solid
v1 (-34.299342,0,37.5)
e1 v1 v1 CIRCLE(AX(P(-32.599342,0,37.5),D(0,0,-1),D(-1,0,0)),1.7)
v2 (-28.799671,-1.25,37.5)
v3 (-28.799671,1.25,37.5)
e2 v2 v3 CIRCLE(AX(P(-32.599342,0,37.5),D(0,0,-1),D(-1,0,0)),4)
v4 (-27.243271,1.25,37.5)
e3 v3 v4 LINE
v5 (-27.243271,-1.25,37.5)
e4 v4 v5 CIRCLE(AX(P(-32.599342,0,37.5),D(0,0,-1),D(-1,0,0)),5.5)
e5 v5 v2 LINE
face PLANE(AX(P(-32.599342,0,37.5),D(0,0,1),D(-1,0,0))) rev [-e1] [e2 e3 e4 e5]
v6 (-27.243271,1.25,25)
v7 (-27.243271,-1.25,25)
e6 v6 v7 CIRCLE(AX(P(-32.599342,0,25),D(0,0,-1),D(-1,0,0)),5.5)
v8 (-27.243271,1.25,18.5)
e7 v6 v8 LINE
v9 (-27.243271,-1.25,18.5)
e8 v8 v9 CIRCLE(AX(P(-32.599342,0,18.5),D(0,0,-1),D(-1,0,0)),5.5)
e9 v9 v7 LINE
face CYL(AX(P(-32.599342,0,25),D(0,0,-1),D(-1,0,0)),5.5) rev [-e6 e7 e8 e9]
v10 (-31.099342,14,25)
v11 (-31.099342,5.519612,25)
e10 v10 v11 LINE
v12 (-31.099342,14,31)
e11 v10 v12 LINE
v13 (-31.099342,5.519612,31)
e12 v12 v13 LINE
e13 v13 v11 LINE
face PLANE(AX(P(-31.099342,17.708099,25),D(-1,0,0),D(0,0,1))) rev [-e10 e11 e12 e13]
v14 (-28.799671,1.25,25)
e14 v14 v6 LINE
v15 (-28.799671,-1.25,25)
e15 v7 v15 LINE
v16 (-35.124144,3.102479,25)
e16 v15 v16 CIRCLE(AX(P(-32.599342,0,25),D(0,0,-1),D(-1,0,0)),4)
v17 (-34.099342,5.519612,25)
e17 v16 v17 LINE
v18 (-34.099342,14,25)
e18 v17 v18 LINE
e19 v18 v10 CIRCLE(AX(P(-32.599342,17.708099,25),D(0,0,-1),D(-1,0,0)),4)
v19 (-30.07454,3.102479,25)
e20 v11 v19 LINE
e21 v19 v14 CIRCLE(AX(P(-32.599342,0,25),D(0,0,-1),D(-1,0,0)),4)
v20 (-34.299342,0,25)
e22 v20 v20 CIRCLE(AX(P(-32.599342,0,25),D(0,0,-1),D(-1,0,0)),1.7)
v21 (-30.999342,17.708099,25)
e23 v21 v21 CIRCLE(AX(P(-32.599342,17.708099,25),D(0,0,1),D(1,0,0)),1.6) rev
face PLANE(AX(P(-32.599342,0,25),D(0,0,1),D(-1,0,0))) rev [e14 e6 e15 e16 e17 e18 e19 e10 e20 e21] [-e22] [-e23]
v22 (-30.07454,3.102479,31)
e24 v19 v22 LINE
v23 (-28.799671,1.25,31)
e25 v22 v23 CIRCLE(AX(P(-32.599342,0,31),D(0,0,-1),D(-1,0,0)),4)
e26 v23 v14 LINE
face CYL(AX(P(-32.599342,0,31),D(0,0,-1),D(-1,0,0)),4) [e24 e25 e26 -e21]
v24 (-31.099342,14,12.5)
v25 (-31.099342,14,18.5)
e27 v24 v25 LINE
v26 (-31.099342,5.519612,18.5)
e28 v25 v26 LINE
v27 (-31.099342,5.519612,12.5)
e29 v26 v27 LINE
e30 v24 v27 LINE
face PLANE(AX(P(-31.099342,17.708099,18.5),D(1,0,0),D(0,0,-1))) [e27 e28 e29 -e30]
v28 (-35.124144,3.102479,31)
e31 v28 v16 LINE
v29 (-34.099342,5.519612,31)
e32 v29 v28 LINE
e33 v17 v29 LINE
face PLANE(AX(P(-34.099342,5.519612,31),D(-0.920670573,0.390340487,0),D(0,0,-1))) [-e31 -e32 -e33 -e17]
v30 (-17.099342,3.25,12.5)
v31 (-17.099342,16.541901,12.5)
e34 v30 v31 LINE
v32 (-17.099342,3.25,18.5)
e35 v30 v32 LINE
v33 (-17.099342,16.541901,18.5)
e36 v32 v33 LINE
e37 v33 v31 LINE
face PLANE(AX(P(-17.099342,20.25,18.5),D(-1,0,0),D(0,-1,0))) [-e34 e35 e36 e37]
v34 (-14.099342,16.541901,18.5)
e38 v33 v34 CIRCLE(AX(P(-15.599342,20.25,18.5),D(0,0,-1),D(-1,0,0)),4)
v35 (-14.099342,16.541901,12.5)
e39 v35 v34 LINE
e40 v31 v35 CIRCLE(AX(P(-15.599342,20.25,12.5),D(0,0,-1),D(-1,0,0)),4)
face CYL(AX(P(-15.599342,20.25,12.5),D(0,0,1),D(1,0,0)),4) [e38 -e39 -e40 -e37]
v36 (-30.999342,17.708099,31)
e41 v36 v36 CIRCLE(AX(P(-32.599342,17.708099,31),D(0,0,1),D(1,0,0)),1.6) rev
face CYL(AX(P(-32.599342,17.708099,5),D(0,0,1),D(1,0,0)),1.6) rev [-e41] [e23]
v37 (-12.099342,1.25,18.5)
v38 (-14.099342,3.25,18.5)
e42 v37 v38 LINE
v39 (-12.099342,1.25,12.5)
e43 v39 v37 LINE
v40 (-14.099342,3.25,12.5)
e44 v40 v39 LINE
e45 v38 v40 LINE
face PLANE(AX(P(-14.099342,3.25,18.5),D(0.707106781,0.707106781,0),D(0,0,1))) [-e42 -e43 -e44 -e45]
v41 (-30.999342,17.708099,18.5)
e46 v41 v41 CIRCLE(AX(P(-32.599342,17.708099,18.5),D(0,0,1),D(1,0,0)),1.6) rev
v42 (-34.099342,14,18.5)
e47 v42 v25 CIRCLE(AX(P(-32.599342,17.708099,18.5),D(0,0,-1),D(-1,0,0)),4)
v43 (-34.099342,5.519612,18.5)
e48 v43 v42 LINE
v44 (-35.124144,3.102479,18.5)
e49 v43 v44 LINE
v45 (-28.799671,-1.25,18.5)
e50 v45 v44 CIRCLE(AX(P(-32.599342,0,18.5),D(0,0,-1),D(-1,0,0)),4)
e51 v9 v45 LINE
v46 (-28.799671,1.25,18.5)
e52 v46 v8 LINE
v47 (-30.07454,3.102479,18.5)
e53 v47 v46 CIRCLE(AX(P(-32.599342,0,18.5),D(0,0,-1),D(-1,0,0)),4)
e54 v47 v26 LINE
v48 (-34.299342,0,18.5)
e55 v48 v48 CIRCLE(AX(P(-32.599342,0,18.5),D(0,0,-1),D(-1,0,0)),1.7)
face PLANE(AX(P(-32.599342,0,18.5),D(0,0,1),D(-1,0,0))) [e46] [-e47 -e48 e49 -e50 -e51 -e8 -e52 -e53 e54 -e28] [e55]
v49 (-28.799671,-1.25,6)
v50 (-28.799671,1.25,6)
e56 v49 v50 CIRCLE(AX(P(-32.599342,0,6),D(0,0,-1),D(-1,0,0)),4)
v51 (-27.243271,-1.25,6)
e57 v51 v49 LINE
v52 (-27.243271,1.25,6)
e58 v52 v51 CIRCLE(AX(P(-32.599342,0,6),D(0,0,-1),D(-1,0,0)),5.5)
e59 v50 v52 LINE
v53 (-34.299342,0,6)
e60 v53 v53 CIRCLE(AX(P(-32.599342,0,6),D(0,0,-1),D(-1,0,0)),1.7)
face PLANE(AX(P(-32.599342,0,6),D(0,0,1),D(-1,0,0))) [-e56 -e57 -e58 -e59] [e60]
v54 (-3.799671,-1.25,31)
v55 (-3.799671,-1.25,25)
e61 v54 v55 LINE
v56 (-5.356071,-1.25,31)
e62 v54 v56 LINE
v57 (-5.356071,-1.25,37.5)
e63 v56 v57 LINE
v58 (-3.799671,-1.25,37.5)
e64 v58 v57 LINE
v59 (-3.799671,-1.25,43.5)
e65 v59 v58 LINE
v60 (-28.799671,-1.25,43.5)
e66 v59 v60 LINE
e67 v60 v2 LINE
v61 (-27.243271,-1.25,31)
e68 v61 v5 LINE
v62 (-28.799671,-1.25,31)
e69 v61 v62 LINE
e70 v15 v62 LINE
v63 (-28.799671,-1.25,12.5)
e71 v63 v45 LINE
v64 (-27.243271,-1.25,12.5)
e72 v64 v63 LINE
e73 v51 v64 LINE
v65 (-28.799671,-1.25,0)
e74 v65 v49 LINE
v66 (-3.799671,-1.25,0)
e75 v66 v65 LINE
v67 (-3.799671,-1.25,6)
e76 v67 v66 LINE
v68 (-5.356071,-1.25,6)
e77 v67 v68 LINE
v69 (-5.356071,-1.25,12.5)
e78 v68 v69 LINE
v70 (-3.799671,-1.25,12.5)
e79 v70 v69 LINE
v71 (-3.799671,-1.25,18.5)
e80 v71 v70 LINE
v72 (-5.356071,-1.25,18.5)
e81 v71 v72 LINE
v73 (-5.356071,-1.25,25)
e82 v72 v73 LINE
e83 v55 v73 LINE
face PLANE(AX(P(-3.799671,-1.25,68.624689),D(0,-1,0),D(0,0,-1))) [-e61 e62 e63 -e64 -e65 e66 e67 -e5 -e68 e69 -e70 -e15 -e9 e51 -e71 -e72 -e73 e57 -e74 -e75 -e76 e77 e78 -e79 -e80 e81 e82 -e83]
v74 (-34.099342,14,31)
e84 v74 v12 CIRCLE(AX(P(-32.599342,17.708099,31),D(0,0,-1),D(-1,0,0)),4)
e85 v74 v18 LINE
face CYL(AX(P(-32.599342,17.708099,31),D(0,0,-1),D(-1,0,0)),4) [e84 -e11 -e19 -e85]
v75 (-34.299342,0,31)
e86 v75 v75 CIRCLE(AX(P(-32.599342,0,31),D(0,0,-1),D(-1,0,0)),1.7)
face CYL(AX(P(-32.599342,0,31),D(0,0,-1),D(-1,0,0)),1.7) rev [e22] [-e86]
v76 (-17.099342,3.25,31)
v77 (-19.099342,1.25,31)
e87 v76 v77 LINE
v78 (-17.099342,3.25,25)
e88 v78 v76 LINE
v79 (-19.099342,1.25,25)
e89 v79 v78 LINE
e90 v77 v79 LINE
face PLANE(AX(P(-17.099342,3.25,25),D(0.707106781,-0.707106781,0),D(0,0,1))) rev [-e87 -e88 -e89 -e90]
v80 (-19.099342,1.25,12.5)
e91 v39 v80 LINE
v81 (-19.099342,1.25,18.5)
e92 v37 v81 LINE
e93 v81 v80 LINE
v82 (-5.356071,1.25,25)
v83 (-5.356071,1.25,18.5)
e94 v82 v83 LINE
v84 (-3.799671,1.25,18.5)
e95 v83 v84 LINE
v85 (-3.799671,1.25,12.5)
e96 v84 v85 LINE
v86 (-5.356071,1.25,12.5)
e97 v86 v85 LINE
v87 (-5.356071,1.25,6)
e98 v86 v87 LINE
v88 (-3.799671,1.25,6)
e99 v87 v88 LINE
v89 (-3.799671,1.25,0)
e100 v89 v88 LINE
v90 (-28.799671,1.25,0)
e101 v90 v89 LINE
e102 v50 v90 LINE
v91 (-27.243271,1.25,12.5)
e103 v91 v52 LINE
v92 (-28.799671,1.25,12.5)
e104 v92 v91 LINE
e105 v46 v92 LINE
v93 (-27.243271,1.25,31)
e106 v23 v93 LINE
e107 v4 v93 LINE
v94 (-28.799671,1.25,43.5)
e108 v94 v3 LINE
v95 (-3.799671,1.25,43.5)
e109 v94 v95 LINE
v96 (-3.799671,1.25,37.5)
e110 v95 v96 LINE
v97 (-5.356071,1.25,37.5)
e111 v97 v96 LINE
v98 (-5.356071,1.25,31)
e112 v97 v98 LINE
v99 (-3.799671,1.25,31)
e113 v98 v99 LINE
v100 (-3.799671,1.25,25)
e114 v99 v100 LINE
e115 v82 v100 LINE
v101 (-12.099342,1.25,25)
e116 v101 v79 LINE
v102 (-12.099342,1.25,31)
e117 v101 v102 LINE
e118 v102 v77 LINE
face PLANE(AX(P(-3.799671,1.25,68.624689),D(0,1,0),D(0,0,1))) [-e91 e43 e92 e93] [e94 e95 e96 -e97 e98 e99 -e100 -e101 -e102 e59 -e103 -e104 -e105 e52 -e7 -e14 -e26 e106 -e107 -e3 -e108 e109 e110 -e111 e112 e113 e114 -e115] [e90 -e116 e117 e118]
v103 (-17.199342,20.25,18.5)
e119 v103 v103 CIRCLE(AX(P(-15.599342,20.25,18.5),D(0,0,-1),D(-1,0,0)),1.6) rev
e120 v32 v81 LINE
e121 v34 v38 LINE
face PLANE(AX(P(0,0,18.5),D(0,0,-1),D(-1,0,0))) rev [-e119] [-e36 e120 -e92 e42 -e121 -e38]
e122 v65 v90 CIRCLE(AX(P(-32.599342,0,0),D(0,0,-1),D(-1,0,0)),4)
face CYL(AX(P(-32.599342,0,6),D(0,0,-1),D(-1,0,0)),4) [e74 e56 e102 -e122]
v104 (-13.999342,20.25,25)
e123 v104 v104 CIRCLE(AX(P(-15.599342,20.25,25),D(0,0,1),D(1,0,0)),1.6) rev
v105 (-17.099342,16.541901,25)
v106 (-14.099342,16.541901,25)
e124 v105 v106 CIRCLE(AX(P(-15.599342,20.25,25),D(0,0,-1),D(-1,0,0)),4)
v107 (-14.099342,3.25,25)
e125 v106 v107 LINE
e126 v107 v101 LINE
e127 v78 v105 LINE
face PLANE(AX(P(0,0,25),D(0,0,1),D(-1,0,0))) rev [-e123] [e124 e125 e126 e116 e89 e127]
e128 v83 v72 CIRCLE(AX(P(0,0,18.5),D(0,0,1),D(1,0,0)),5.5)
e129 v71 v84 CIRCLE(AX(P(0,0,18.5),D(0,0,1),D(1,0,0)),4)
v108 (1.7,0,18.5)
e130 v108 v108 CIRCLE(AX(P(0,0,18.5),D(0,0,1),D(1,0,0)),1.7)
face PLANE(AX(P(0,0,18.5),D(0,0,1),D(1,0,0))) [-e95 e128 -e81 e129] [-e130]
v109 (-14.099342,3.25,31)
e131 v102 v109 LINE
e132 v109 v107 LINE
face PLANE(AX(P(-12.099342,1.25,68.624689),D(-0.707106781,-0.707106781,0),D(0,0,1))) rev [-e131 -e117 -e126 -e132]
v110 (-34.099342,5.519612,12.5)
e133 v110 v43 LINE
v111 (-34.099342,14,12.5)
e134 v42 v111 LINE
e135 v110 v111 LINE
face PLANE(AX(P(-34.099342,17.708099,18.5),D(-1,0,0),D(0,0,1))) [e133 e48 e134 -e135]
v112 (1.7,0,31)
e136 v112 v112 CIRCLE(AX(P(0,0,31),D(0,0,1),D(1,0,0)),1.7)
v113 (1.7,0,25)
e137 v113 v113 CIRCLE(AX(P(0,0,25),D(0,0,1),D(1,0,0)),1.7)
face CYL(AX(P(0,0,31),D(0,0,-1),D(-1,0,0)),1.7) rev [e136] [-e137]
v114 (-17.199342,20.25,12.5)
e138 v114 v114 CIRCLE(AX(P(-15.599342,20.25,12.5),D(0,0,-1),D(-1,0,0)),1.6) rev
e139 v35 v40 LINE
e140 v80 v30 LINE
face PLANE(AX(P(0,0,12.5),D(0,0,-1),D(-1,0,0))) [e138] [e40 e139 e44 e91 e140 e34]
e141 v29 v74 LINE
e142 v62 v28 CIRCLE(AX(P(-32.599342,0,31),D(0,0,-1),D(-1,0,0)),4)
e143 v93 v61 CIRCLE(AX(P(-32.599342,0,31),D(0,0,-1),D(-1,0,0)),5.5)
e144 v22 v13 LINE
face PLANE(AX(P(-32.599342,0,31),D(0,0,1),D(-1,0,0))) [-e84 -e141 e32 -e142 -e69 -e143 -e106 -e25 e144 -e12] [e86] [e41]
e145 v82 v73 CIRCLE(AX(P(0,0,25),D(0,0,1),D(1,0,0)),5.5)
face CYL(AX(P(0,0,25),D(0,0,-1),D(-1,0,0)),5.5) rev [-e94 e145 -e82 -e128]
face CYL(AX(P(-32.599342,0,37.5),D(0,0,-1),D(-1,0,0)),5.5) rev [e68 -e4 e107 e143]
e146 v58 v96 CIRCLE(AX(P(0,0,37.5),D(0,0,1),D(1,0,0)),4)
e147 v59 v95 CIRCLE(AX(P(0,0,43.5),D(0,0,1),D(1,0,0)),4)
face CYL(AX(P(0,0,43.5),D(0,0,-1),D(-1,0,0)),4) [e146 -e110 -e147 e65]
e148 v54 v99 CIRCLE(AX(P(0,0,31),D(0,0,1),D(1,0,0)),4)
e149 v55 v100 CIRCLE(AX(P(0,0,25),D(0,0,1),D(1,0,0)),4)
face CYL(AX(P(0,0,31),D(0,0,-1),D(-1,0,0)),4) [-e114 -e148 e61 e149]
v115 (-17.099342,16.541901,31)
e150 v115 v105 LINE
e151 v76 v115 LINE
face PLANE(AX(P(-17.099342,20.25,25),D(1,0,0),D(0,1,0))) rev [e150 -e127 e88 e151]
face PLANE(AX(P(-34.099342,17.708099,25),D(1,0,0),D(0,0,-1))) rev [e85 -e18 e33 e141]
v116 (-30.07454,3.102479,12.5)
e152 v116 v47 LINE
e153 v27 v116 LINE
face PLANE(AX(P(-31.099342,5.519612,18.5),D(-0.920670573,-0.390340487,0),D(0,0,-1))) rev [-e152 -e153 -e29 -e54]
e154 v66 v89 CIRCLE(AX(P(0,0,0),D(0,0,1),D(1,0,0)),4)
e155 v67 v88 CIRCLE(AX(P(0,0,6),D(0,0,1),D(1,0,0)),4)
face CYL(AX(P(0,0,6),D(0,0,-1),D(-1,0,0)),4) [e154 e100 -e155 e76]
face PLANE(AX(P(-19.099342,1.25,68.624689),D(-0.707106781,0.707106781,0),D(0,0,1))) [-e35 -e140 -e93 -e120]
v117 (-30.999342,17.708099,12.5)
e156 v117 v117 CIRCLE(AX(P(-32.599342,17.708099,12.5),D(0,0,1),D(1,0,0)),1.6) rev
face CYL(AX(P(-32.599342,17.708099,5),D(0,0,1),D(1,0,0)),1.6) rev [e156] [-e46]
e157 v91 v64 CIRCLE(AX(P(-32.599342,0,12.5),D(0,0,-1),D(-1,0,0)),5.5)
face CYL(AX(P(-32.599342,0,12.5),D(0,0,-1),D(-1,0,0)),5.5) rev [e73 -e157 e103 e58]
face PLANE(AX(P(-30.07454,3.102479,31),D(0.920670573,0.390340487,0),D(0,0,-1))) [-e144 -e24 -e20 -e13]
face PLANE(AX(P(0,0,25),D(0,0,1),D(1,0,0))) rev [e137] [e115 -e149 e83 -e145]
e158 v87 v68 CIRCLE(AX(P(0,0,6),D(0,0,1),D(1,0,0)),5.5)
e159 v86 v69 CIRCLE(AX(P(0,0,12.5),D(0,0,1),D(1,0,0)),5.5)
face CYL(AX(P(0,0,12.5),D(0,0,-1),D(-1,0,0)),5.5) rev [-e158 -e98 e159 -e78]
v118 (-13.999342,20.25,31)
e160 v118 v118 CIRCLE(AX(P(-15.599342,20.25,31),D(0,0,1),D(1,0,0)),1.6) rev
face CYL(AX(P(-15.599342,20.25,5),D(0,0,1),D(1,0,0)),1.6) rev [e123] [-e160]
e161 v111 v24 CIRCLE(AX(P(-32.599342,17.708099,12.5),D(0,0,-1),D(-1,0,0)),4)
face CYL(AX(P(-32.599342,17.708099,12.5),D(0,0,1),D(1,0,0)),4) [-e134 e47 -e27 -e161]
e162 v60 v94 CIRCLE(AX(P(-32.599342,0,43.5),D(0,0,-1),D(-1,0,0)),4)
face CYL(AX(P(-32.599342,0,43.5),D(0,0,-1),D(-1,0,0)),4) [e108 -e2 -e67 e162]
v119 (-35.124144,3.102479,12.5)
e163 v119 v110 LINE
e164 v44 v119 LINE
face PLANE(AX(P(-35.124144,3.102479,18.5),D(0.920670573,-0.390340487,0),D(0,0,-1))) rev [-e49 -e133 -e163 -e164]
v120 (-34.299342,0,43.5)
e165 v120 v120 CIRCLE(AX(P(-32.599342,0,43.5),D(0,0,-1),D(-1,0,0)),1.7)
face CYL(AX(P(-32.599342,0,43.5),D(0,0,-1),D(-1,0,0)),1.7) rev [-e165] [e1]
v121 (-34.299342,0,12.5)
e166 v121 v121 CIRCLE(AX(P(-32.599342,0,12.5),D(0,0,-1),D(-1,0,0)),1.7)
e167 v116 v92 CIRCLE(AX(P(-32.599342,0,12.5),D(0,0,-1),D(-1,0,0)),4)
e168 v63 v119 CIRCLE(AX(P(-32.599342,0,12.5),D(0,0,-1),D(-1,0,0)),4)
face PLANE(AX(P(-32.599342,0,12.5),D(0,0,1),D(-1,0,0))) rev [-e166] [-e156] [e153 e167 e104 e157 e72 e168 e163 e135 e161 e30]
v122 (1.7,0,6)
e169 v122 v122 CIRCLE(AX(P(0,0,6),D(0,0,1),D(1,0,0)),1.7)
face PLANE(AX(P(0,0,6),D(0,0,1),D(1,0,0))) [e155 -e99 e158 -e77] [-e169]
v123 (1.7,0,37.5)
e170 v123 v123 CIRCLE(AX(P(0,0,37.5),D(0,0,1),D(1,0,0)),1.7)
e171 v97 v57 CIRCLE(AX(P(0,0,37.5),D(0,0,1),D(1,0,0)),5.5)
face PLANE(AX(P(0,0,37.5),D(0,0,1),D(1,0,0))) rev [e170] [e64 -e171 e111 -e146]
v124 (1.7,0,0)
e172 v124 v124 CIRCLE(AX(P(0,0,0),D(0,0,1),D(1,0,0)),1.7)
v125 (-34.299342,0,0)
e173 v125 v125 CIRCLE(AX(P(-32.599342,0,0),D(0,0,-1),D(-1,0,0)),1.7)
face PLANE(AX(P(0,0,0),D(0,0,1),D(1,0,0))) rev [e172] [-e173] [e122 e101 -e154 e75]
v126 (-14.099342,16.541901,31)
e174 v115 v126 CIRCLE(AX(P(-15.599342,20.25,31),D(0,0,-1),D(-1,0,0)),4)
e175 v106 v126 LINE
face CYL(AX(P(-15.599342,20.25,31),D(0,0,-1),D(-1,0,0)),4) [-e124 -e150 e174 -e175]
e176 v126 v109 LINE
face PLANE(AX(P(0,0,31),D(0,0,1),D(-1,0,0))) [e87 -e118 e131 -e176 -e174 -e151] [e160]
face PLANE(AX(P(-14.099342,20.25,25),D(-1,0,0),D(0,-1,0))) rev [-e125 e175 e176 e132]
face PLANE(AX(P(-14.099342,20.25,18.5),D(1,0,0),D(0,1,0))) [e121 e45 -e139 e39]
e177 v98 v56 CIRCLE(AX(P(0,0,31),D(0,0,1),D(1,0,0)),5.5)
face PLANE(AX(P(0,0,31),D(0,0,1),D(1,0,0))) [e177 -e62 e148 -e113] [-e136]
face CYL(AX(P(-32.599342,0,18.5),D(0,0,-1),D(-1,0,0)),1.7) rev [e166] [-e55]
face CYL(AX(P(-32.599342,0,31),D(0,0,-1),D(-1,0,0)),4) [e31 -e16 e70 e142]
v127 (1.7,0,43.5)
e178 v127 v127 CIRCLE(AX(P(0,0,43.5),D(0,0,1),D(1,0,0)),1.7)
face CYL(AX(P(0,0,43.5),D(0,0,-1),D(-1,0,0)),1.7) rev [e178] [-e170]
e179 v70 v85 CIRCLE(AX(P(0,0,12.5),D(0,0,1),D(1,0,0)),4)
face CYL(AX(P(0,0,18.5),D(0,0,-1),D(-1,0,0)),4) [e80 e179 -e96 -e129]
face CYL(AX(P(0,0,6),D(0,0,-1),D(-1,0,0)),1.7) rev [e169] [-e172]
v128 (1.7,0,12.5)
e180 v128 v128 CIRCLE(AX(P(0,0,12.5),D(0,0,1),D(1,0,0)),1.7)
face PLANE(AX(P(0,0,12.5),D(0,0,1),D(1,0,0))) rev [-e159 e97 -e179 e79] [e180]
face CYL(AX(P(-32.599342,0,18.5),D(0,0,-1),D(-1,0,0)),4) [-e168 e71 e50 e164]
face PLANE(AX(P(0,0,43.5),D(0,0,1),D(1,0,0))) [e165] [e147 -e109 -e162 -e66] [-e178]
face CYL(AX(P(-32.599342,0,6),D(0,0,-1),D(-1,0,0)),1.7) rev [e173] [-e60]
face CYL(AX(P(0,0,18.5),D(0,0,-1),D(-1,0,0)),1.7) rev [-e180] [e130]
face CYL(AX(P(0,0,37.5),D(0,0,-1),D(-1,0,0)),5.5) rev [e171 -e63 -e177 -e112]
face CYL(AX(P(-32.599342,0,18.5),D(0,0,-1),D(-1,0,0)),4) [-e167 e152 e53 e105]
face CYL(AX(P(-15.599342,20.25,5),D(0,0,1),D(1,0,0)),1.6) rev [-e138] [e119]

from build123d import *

# Parameters (mm, degrees)
SKETCH_2_R                   = 4
SKETCH_2_R_2                 = 1.7
EXTRUDE_1_DEPTH              = 6
PATTERN_LINEAR_1_COUNT       = 4
PATTERN_LINEAR_1_PITCH       = 12.5
EXTRUDE_START                = -43.5
SKETCH_3_W                   = 25
SKETCH_3_H                   = 2.5
EXTRUDE_2_DEPTH              = 43.5
SKETCH_4_R                   = 5.5
CUT_EXTRUDE_1_DEPTH          = 6.5
PATTERN_LINEAR_2_COUNT       = 4
PATTERN_LINEAR_2_PITCH       = 12.5
PATTERN_START                = 12.5
PATTERN_LINEAR_3_OUTLINE_R   = 1.7
PATTERN_LINEAR_3_DEPTH       = 6
PATTERN_START_2              = 25
PATTERN_LINEAR_3_2_OUTLINE_R = 1.7
PATTERN_LINEAR_3_2_DEPTH     = 6
PATTERN_START_3              = 37.5
PATTERN_LINEAR_3_3_OUTLINE_R = 1.7
PATTERN_LINEAR_3_3_DEPTH     = 6
MIRROR_3_COPY_1_SKETCH_R     = 5.5
MIRROR_3_COPY_1_DEPTH        = 6.5
MIRROR_3_COPY_2_SKETCH_R     = 5.5
MIRROR_3_COPY_2_DEPTH        = 6.5
MIRROR_3_COPY_3_SKETCH_R     = 5.5
MIRROR_3_COPY_3_DEPTH        = 6.5
SKETCH_5_W                   = 3
SKETCH_5_H                   = 14
SKETCH_5_H_2                 = 19
EXTRUDE_3_DEPTH              = 6
SKETCH_6_R                   = 4
EXTRUDE_4_DEPTH              = 6
CUT_EXTRUDE_2_DEPTH          = 20
CUT_EXTRUDE_2_DEPTH_BACK     = 10
SKETCH_7_R                   = 1.6
CHAMFER_1_SIZE               = 2
CHAMFER_2_SIZE               = 1.81151278


with BuildPart() as part:
    # Эскиз2 → Бобышка-Вытянуть1 (new body)
    with BuildSketch(Plane.XY):
        Circle(SKETCH_2_R)
        Circle(SKETCH_2_R_2, mode=Mode.SUBTRACT)
    extrude_1 = extrude(amount=EXTRUDE_1_DEPTH)


with BuildPart() as pattern_linear_1_1:
    # Линейный массив1: pattern copy
    add(part.part.moved(Location(Vector(0, 0, 1) * (1 * PATTERN_LINEAR_1_PITCH))))


with BuildPart() as pattern_linear_1_2:
    # Линейный массив1: pattern copy
    add(part.part.moved(Location(Vector(0, 0, 1) * (2 * PATTERN_LINEAR_1_PITCH))))


with BuildPart() as pattern_linear_1_3:
    # Линейный массив1: pattern copy
    add(part.part.moved(Location(Vector(0, 0, 1) * (3 * PATTERN_LINEAR_1_PITCH))))


with BuildPart() as part_1:
    add(part.part)

    add(pattern_linear_1_1.part)  # Бобышка-Вытянуть2 merges Линейный массив1_1

    add(pattern_linear_1_2.part)  # Бобышка-Вытянуть2 merges Линейный массив1_2

    add(pattern_linear_1_3.part)  # Бобышка-Вытянуть2 merges Линейный массив1_3
    # Эскиз3 → Бобышка-Вытянуть2 (add)
    with BuildSketch(Plane(origin=(0, 0, 0), x_dir=(-1, 0, 0), z_dir=(0, 0, -1)).offset(EXTRUDE_START)):
        with Locations((16.299671038, 0)):
            Rectangle(SKETCH_3_W, SKETCH_3_H)
    extrude(amount=EXTRUDE_2_DEPTH)

    # Эскиз4 → Вырез-Вытянуть1 (cut)
    with BuildSketch(Plane.XY.offset(6)):
        Circle(SKETCH_4_R)
    cut_extrude_1 = extrude(amount=CUT_EXTRUDE_1_DEPTH, mode=Mode.SUBTRACT)

    # Линейный массив2: Вырез-Вытянуть1 ×4
    with Locations(*[(0, 0, i * PATTERN_LINEAR_2_PITCH) for i in range(1, PATTERN_LINEAR_2_COUNT)]):
        add(cut_extrude_1, mode=Mode.SUBTRACT)

    # Зеркальное отражение1: Бобышка-Вытянуть1 across plane
    add(extrude_1.mirror(Plane.ZY.offset(16.299671038)))

    # Линейный массив3: read off the stored shape, not the designer's step
    # Линейный массив3 outline → Линейный массив3 (add)
    with BuildSketch(Plane.XY.offset(PATTERN_START)):
        with BuildLine():
            ThreePointArc((-28.799671038, 1.25), (-36.599342077, 0), (-28.799671038, -1.25))
            Line((-28.799671038, -1.25), (-28.799671038, 1.25))
        make_face()
        with Locations((-32.599342077, 0)):
            Circle(PATTERN_LINEAR_3_OUTLINE_R, mode=Mode.SUBTRACT)
    extrude(amount=PATTERN_LINEAR_3_DEPTH)

    # Pattern Linear 3 2 outline → Pattern Linear 3 2 (add)
    with BuildSketch(Plane.XY.offset(PATTERN_START_2)):
        with BuildLine():
            ThreePointArc((-28.799671038, 1.25), (-36.599342077, 0), (-28.799671038, -1.25))
            Line((-28.799671038, -1.25), (-28.799671038, 1.25))
        make_face()
        with Locations((-32.599342077, 0)):
            Circle(PATTERN_LINEAR_3_2_OUTLINE_R, mode=Mode.SUBTRACT)
    extrude(amount=PATTERN_LINEAR_3_2_DEPTH)

    # Pattern Linear 3 3 outline → Pattern Linear 3 3 (add)
    with BuildSketch(Plane.XY.offset(PATTERN_START_3)):
        with BuildLine():
            ThreePointArc((-28.799671038, 1.25), (-36.599342077, 0), (-28.799671038, -1.25))
            Line((-28.799671038, -1.25), (-28.799671038, 1.25))
        make_face()
        with Locations((-32.599342077, 0)):
            Circle(PATTERN_LINEAR_3_3_OUTLINE_R, mode=Mode.SUBTRACT)
    extrude(amount=PATTERN_LINEAR_3_3_DEPTH)

    # Зеркальное отражение3: Вырез-Вытянуть1 across plane
    add(cut_extrude_1.mirror(Plane.ZY.offset(16.299671038)), mode=Mode.SUBTRACT)

    # Зеркальное отражение3 copy 1 sketch → Зеркальное отражение3 copy 1 (cut)
    with BuildSketch(Plane(origin=(-32.599342077, 0, 18.5), x_dir=(-1, 0, 0), z_dir=(0, 0, 1))):
        Circle(MIRROR_3_COPY_1_SKETCH_R)
    extrude(amount=MIRROR_3_COPY_1_DEPTH, mode=Mode.SUBTRACT)

    # Зеркальное отражение3 copy 2 sketch → Зеркальное отражение3 copy 2 (cut)
    with BuildSketch(Plane(origin=(-32.599342077, 0, 31), x_dir=(-1, 0, 0), z_dir=(0, 0, 1))):
        Circle(MIRROR_3_COPY_2_SKETCH_R)
    extrude(amount=MIRROR_3_COPY_2_DEPTH, mode=Mode.SUBTRACT)

    # Зеркальное отражение3 copy 3 sketch → Зеркальное отражение3 copy 3 (cut)
    with BuildSketch(Plane(origin=(-32.599342077, 0, 43.5), x_dir=(-1, 0, 0), z_dir=(0, 0, 1))):
        Circle(MIRROR_3_COPY_3_SKETCH_R)
    extrude(amount=MIRROR_3_COPY_3_DEPTH, mode=Mode.SUBTRACT)

    # Эскиз5 → Бобышка-Вытянуть3 (add)
    with BuildSketch(Plane(origin=(0, 0, 12.5), x_dir=(-1, 0, 0), z_dir=(0, 0, -1))):
        with Locations((32.599342077, 10.708099244)):
            Rectangle(SKETCH_5_W, SKETCH_5_H)
        with Locations((15.599342077, 10.75)):
            Rectangle(SKETCH_5_W, SKETCH_5_H_2)
    extrude_3 = extrude(amount=-EXTRUDE_3_DEPTH)

    # Зеркальное отражение4: Бобышка-Вытянуть3 across plane
    add(extrude_3.mirror(Plane.XY.offset(21.75)))

    # Эскиз6 → Бобышка-Вытянуть4 (add)
    with BuildSketch(Plane(origin=(0, 0, 25), x_dir=(-1, 0, 0), z_dir=(0, 0, -1))):
        with Locations((32.599342077, 17.708099244)):
            Circle(SKETCH_6_R)
        with Locations((15.599342077, 20.25)):
            Circle(SKETCH_6_R)
    extrude_4 = extrude(amount=-EXTRUDE_4_DEPTH)

    # Зеркальное отражение5: Бобышка-Вытянуть4 across plane
    add(extrude_4.mirror(Plane.XY.offset(21.75)))

    # Эскиз7 → Вырез-Вытянуть2 (cut, two sides: drawn at the far end of the back side and taken through both)
    with BuildSketch(Plane(origin=(0, 0, 25), x_dir=(-1, 0, 0), z_dir=(0, 0, -1)).offset(-CUT_EXTRUDE_2_DEPTH_BACK)):
        with Locations(Location((32.599342077, 17.708099244, 0), (0, 0, 180))):
            Circle(SKETCH_7_R)
        with Locations(Location((15.599342077, 20.25, 0), (0, 0, 180))):
            Circle(SKETCH_7_R)
    extrude(amount=CUT_EXTRUDE_2_DEPTH + CUT_EXTRUDE_2_DEPTH_BACK, mode=Mode.SUBTRACT)

    # Фаска1
    chamfer_1_edges = [part_1.edges().sort_by_distance(p)[0] for p in [
        (-14.099342077, 1.25, 15.5),
        (-17.099342077, 1.25, 15.5),
        (-14.099342077, 1.25, 28),
        (-17.099342077, 1.25, 28),
    ]]
    chamfer(chamfer_1_edges, length=CHAMFER_1_SIZE)

    # Фаска2
    # the kernel refuses this chamfer: 1.81151278, 1 mm, written as the material it adds along each edge
    with BuildSketch(Plane(origin=(-31.099342077, 3.708099244, 12.5), x_dir=(0, 1, 0), z_dir=(0, 0, 1))) as chamfer_2_piece_1:
        with BuildLine():
            Line((CHAMFER_2_SIZE, 0), (-0.60562029, -1.024801843))
            ThreePointArc((-0.60562029, -1.024801843), (-0.279646114, -0.560511864), (0, 0))
            Line((0, 0), (CHAMFER_2_SIZE, 0))
        make_face()
    extrude(amount=6)
    with BuildSketch(Plane(origin=(-34.099342077, 3.708099244, 12.5), x_dir=(-0.8609060833404796, -0.5087639095566383, 0), z_dir=(0, 0, 1))) as chamfer_2_piece_2:
        with BuildLine():
            Line((1.190375888, 0), (-CHAMFER_2_SIZE * 0.508763909682, -CHAMFER_2_SIZE * 0.860906083552))
            Line((-CHAMFER_2_SIZE * 0.508763909682, -CHAMFER_2_SIZE * 0.860906083552), (0, 0))
            ThreePointArc((0, 0), (0.624821924, -0.044419166), (1.190375888, 0))
        make_face()
    extrude(amount=6)
    with BuildSketch(Plane(origin=(-31.099342077, 3.708099244, 31), x_dir=(0, 1, 0), z_dir=(0, 0, -1))) as chamfer_2_piece_3:
        with BuildLine():
            Line((CHAMFER_2_SIZE, 0), (-0.60562029, 1.024801843))
            ThreePointArc((-0.60562029, 1.024801843), (-0.279646114, 0.560511864), (0, 0))
            Line((0, 0), (CHAMFER_2_SIZE, 0))
        make_face()
    extrude(amount=6)
    with BuildSketch(Plane(origin=(-34.099342077, 3.708099244, 31), x_dir=(-0.8609060833404796, -0.5087639095566383, 0), z_dir=(0, 0, -1))) as chamfer_2_piece_4:
        with BuildLine():
            Line((1.190375888, 0), (-CHAMFER_2_SIZE * 0.508763909682, CHAMFER_2_SIZE * 0.860906083552))
            Line((-CHAMFER_2_SIZE * 0.508763909682, CHAMFER_2_SIZE * 0.860906083552), (0, 0))
            ThreePointArc((0, 0), (0.624821924, 0.044419166), (1.190375888, 0))
        make_face()
    extrude(amount=6)


solid = part_1.part
